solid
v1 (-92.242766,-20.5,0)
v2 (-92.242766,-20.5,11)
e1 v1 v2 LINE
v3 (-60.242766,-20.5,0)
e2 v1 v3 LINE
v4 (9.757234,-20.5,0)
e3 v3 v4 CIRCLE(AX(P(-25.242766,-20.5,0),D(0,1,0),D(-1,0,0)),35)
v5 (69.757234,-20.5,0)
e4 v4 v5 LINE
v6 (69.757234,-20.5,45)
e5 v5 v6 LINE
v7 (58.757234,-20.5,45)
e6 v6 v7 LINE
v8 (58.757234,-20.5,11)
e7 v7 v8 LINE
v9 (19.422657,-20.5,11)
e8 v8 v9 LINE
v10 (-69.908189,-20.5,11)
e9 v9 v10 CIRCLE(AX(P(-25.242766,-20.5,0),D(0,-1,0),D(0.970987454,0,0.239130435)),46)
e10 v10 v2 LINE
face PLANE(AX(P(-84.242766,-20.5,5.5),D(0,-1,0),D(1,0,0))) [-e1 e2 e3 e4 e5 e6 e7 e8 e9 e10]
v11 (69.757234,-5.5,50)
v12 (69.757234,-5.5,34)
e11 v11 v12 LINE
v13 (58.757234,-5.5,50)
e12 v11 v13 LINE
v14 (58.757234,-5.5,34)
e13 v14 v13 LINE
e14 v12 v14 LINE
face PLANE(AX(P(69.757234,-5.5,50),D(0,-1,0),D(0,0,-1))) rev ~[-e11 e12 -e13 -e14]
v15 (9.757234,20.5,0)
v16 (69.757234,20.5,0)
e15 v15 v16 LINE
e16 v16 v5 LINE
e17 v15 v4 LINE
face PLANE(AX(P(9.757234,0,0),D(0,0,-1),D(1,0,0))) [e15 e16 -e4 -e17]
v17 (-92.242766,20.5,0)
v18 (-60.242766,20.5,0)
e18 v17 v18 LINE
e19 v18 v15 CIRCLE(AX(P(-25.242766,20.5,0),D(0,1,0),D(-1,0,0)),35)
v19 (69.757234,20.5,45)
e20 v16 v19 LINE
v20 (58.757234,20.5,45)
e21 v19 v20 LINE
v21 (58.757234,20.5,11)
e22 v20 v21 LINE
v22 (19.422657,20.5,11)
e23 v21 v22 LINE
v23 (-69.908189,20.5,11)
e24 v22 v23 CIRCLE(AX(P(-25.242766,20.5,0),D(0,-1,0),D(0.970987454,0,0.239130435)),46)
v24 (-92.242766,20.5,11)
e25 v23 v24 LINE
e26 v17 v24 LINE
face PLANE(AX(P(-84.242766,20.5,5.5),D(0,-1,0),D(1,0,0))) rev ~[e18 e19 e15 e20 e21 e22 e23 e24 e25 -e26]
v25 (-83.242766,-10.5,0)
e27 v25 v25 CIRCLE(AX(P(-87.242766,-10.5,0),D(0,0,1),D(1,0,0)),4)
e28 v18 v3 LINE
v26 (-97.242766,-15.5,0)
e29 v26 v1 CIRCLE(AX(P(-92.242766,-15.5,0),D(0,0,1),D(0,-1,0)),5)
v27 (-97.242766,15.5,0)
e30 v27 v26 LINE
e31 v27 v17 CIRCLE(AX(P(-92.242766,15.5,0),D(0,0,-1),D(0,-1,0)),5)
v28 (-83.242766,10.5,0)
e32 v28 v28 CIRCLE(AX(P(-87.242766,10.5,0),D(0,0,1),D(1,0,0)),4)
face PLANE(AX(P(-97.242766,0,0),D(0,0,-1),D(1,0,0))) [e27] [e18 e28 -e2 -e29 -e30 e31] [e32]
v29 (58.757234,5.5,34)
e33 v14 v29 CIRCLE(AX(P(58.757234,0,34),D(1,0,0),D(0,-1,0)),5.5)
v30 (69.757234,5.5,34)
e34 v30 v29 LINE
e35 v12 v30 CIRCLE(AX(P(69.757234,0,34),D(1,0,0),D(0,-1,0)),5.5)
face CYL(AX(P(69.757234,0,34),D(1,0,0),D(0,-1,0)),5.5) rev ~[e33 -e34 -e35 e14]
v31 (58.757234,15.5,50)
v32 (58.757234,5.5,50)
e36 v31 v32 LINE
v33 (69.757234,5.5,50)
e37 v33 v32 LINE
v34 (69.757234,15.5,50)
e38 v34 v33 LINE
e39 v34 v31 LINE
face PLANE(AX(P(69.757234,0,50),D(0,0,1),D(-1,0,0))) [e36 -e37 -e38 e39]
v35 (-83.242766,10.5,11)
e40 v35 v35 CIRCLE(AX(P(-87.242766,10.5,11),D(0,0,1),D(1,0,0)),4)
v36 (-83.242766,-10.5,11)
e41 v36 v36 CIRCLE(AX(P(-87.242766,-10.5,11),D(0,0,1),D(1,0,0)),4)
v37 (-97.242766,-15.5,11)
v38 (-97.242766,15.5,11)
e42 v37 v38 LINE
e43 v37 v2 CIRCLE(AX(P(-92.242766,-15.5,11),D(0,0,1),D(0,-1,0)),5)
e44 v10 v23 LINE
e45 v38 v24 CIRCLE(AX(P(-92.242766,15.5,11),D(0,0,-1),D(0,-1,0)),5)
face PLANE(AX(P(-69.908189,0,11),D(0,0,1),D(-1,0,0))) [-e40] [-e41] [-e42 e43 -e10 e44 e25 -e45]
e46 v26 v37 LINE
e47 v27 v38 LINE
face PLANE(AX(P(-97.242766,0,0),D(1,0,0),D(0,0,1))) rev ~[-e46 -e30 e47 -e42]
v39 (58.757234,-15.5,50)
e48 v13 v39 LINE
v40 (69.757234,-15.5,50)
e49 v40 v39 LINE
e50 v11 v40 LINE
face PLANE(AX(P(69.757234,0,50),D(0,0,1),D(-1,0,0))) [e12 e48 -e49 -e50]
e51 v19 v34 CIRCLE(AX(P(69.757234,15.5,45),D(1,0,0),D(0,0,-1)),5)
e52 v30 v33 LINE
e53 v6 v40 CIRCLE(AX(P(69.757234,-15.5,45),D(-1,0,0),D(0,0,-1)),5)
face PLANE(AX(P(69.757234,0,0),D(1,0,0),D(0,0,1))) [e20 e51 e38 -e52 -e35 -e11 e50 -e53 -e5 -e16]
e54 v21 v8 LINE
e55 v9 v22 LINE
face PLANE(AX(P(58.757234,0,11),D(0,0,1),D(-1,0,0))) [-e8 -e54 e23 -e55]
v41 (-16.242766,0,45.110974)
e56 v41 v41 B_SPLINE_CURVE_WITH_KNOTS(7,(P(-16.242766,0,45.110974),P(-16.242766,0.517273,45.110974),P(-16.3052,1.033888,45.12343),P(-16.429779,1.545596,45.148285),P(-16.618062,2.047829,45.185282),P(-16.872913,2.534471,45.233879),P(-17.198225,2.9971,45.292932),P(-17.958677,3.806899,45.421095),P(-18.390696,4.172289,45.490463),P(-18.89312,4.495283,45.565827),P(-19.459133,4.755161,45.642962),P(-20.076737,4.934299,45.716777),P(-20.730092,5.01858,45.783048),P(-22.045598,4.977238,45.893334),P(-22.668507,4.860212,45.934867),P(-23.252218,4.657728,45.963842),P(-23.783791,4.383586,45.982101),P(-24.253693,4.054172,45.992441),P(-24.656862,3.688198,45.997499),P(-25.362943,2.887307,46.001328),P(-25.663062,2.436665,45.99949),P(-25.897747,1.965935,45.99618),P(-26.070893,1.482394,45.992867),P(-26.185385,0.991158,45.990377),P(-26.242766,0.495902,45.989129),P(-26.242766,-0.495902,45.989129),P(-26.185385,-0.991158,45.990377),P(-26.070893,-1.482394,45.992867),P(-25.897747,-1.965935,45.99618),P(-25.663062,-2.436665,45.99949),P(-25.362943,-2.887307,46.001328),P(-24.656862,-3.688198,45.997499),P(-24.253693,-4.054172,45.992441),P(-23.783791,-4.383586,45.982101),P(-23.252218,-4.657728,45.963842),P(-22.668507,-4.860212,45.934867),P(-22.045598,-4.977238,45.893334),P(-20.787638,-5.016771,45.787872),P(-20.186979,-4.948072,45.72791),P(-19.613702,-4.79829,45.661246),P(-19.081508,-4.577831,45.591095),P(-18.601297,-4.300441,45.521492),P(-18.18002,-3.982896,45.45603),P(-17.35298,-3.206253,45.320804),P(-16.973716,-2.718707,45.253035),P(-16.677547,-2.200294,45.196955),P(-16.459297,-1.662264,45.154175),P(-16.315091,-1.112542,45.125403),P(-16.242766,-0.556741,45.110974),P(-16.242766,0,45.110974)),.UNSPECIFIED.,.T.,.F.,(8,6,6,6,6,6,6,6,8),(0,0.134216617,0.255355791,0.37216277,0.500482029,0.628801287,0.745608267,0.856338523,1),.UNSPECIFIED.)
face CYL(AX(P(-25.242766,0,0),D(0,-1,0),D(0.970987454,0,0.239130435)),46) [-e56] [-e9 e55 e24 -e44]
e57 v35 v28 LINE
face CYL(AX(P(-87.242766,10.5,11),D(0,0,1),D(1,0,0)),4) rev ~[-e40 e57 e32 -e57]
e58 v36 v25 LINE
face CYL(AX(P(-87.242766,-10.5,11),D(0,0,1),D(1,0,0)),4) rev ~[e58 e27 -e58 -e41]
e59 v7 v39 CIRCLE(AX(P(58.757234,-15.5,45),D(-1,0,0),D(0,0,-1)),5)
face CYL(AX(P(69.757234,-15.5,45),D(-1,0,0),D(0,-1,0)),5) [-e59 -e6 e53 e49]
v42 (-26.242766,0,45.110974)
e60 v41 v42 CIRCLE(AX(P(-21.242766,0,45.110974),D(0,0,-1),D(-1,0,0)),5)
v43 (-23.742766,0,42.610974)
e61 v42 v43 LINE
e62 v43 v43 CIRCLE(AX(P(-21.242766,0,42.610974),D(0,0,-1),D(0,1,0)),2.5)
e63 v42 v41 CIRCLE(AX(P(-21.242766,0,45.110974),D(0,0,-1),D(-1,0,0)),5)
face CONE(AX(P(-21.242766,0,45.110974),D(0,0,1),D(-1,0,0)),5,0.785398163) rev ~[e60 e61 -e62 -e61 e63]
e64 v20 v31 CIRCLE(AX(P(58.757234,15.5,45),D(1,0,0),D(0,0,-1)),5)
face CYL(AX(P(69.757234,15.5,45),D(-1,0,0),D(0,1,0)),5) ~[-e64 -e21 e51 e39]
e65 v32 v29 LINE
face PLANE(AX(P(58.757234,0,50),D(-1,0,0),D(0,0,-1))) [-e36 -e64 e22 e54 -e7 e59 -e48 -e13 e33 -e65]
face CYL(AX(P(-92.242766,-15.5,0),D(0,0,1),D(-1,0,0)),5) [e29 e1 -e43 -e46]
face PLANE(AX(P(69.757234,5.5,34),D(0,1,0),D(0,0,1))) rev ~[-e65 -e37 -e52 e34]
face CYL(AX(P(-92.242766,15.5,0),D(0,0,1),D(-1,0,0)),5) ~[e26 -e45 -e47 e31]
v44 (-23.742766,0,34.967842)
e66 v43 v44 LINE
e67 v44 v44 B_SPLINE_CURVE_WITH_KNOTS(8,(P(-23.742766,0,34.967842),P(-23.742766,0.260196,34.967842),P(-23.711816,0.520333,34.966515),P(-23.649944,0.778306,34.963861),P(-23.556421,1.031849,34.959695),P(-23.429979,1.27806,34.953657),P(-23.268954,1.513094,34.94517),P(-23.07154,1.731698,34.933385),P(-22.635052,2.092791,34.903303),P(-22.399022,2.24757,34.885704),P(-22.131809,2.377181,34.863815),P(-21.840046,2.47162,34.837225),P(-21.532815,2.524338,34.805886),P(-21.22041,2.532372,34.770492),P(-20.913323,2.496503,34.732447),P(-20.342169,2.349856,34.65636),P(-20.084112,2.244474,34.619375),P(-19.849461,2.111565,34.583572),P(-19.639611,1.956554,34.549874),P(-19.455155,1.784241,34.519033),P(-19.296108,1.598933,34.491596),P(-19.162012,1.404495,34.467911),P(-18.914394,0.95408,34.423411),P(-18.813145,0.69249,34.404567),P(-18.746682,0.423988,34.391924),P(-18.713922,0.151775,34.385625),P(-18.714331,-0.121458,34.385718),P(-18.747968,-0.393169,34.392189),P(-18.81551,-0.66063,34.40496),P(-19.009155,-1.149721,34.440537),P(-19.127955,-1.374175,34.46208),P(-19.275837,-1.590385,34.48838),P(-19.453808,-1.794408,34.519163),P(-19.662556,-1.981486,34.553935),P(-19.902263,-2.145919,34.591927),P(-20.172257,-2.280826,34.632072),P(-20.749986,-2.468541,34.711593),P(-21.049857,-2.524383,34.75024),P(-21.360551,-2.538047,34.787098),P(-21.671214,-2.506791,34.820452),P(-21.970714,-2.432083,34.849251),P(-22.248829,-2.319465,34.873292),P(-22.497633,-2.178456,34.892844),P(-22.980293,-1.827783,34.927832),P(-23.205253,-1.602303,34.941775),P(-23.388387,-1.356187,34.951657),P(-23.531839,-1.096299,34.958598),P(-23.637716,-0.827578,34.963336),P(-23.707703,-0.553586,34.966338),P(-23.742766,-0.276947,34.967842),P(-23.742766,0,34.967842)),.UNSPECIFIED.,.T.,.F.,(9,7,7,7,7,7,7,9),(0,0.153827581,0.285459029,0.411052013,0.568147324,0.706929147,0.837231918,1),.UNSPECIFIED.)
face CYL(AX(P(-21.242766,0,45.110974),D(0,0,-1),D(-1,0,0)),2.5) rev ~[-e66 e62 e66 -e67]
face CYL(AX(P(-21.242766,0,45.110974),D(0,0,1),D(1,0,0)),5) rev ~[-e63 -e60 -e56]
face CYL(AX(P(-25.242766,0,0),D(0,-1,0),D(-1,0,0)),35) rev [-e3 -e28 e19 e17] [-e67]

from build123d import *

# Parameters (mm, degrees)
F0_W           = 26
F0_H           = 11
F0_W_2         = 38
F1_DEPTH       = 20.5
F2_R           = 5
F3_R           = 5
F4_R           = 4
F5_DEPTH       = 12
F7_DEPTH       = 25
F9_D           = 5
F9_START       = 4.8890258
F9_CSINK_D     = 10
F9_CSINK_ANGLE = 90


# Not quite as in the source:
# - a feature names something its author has since deleted; it is built from what else it names


with BuildPart() as f1:
    # F0 (on Front) → F1 (new body, symmetric)
    with BuildSketch(Plane.XZ):
        with Locations((-84.2427663654, 5.5)):
            Rectangle(F0_W, F0_H)
        with BuildLine():
            Line((-69.9081892337, 11), (-71.2427663654, 11))
            Line((-71.2427663654, 11), (-71.2427663654, 0))
            ThreePointArc((-71.2427663654, 0), (-70.9079032421, 5.5403315812), (-69.9081892337, 11))
        make_face()
        with BuildLine():
            ThreePointArc((-69.9081892337, 11), (-70.9079032421, 5.5403315812), (-71.2427663654, 0))
            Line((-71.2427663654, 0), (-60.2427663654, 0))
            ThreePointArc((-60.2427663654, 0), (-25.2427663654, 35), (9.7572336346, 0))
            Line((9.7572336346, 0), (20.7572336346, 0))
            ThreePointArc((20.7572336346, 0), (20.4223705113, 5.5403315812), (19.4226565028, 11))
            ThreePointArc((19.4226565028, 11), (-25.2427663654, 46), (-69.9081892337, 11))
        make_face()
        with BuildLine():
            ThreePointArc((19.4226565028, 11), (20.4223705113, 5.5403315812), (20.7572336346, 0))
            Line((20.7572336346, 0), (20.7572336346, 11))
            Line((20.7572336346, 11), (19.4226565028, 11))
        make_face()
        with Locations((39.7572336346, 5.5)):
            Rectangle(F0_W_2, F0_H)
        Polygon((58.7572336346, 11), (58.7572336346, 0), (69.7572336346, 0), (69.7572336346, 50), (58.7572336346, 50), align=None)
    extrude(amount=F1_DEPTH, both=True)

    # F2
    f2_edges = [f1.edges().sort_by_distance(p)[0] for p in [
        (-97.242766, -20.5, 5.5),
        (-97.242766, 20.5, 5.5),
    ]]
    fillet(f2_edges, radius=F2_R)

    # F3
    f3_edges = [f1.edges().sort_by_distance(p)[0] for p in [
        (64.257234, -20.5, 50),
        (64.257234, 20.5, 50),
    ]]
    fillet(f3_edges, radius=F3_R)

    # F4 (on face) → F5 (cut)
    with BuildSketch(Plane.XY.offset(11)):
        with Locations((-87.2427663654, 10.5)):
            Circle(F4_R)
        with Locations((-87.2427663654, -10.5)):
            Circle(F4_R)
    extrude(amount=-F5_DEPTH, mode=Mode.SUBTRACT)

    # F6 (on face) → F7 (cut)
    with BuildSketch(Plane.YZ.offset(69.7572336346)):
        with BuildLine():
            Line((5.5, 50), (-5.5, 50))
            Line((-5.5, 50), (-5.5, 45))
            Line((-5.5, 45), (-5.5, 34))
            ThreePointArc((-5.5, 34), (0, 39.5), (5.5, 34))
            Line((5.5, 34), (5.5, 45))
            Line((5.5, 45), (5.5, 50))
        make_face()
        with BuildLine():
            ThreePointArc((5.5, 34), (0, 39.5), (-5.5, 34))
            Line((-5.5, 34), (5.5, 34))
        make_face()
        with BuildLine():
            Line((5.5, 34), (-5.5, 34))
            ThreePointArc((-5.5, 34), (0, 28.5), (5.5, 34))
        make_face()
    extrude(amount=-F7_DEPTH, mode=Mode.SUBTRACT)

    # F9 (through all)
    # its depths count from where the whole tool has entered the part; down to there all is cleared
    with Locations(Plane.XY.offset(50).offset(-F9_START)):
        with Locations((-21.2427663654, 0)):
            CounterSinkHole(F9_D / 2, F9_CSINK_D / 2, counter_sink_angle=F9_CSINK_ANGLE)


solid = f1.part
